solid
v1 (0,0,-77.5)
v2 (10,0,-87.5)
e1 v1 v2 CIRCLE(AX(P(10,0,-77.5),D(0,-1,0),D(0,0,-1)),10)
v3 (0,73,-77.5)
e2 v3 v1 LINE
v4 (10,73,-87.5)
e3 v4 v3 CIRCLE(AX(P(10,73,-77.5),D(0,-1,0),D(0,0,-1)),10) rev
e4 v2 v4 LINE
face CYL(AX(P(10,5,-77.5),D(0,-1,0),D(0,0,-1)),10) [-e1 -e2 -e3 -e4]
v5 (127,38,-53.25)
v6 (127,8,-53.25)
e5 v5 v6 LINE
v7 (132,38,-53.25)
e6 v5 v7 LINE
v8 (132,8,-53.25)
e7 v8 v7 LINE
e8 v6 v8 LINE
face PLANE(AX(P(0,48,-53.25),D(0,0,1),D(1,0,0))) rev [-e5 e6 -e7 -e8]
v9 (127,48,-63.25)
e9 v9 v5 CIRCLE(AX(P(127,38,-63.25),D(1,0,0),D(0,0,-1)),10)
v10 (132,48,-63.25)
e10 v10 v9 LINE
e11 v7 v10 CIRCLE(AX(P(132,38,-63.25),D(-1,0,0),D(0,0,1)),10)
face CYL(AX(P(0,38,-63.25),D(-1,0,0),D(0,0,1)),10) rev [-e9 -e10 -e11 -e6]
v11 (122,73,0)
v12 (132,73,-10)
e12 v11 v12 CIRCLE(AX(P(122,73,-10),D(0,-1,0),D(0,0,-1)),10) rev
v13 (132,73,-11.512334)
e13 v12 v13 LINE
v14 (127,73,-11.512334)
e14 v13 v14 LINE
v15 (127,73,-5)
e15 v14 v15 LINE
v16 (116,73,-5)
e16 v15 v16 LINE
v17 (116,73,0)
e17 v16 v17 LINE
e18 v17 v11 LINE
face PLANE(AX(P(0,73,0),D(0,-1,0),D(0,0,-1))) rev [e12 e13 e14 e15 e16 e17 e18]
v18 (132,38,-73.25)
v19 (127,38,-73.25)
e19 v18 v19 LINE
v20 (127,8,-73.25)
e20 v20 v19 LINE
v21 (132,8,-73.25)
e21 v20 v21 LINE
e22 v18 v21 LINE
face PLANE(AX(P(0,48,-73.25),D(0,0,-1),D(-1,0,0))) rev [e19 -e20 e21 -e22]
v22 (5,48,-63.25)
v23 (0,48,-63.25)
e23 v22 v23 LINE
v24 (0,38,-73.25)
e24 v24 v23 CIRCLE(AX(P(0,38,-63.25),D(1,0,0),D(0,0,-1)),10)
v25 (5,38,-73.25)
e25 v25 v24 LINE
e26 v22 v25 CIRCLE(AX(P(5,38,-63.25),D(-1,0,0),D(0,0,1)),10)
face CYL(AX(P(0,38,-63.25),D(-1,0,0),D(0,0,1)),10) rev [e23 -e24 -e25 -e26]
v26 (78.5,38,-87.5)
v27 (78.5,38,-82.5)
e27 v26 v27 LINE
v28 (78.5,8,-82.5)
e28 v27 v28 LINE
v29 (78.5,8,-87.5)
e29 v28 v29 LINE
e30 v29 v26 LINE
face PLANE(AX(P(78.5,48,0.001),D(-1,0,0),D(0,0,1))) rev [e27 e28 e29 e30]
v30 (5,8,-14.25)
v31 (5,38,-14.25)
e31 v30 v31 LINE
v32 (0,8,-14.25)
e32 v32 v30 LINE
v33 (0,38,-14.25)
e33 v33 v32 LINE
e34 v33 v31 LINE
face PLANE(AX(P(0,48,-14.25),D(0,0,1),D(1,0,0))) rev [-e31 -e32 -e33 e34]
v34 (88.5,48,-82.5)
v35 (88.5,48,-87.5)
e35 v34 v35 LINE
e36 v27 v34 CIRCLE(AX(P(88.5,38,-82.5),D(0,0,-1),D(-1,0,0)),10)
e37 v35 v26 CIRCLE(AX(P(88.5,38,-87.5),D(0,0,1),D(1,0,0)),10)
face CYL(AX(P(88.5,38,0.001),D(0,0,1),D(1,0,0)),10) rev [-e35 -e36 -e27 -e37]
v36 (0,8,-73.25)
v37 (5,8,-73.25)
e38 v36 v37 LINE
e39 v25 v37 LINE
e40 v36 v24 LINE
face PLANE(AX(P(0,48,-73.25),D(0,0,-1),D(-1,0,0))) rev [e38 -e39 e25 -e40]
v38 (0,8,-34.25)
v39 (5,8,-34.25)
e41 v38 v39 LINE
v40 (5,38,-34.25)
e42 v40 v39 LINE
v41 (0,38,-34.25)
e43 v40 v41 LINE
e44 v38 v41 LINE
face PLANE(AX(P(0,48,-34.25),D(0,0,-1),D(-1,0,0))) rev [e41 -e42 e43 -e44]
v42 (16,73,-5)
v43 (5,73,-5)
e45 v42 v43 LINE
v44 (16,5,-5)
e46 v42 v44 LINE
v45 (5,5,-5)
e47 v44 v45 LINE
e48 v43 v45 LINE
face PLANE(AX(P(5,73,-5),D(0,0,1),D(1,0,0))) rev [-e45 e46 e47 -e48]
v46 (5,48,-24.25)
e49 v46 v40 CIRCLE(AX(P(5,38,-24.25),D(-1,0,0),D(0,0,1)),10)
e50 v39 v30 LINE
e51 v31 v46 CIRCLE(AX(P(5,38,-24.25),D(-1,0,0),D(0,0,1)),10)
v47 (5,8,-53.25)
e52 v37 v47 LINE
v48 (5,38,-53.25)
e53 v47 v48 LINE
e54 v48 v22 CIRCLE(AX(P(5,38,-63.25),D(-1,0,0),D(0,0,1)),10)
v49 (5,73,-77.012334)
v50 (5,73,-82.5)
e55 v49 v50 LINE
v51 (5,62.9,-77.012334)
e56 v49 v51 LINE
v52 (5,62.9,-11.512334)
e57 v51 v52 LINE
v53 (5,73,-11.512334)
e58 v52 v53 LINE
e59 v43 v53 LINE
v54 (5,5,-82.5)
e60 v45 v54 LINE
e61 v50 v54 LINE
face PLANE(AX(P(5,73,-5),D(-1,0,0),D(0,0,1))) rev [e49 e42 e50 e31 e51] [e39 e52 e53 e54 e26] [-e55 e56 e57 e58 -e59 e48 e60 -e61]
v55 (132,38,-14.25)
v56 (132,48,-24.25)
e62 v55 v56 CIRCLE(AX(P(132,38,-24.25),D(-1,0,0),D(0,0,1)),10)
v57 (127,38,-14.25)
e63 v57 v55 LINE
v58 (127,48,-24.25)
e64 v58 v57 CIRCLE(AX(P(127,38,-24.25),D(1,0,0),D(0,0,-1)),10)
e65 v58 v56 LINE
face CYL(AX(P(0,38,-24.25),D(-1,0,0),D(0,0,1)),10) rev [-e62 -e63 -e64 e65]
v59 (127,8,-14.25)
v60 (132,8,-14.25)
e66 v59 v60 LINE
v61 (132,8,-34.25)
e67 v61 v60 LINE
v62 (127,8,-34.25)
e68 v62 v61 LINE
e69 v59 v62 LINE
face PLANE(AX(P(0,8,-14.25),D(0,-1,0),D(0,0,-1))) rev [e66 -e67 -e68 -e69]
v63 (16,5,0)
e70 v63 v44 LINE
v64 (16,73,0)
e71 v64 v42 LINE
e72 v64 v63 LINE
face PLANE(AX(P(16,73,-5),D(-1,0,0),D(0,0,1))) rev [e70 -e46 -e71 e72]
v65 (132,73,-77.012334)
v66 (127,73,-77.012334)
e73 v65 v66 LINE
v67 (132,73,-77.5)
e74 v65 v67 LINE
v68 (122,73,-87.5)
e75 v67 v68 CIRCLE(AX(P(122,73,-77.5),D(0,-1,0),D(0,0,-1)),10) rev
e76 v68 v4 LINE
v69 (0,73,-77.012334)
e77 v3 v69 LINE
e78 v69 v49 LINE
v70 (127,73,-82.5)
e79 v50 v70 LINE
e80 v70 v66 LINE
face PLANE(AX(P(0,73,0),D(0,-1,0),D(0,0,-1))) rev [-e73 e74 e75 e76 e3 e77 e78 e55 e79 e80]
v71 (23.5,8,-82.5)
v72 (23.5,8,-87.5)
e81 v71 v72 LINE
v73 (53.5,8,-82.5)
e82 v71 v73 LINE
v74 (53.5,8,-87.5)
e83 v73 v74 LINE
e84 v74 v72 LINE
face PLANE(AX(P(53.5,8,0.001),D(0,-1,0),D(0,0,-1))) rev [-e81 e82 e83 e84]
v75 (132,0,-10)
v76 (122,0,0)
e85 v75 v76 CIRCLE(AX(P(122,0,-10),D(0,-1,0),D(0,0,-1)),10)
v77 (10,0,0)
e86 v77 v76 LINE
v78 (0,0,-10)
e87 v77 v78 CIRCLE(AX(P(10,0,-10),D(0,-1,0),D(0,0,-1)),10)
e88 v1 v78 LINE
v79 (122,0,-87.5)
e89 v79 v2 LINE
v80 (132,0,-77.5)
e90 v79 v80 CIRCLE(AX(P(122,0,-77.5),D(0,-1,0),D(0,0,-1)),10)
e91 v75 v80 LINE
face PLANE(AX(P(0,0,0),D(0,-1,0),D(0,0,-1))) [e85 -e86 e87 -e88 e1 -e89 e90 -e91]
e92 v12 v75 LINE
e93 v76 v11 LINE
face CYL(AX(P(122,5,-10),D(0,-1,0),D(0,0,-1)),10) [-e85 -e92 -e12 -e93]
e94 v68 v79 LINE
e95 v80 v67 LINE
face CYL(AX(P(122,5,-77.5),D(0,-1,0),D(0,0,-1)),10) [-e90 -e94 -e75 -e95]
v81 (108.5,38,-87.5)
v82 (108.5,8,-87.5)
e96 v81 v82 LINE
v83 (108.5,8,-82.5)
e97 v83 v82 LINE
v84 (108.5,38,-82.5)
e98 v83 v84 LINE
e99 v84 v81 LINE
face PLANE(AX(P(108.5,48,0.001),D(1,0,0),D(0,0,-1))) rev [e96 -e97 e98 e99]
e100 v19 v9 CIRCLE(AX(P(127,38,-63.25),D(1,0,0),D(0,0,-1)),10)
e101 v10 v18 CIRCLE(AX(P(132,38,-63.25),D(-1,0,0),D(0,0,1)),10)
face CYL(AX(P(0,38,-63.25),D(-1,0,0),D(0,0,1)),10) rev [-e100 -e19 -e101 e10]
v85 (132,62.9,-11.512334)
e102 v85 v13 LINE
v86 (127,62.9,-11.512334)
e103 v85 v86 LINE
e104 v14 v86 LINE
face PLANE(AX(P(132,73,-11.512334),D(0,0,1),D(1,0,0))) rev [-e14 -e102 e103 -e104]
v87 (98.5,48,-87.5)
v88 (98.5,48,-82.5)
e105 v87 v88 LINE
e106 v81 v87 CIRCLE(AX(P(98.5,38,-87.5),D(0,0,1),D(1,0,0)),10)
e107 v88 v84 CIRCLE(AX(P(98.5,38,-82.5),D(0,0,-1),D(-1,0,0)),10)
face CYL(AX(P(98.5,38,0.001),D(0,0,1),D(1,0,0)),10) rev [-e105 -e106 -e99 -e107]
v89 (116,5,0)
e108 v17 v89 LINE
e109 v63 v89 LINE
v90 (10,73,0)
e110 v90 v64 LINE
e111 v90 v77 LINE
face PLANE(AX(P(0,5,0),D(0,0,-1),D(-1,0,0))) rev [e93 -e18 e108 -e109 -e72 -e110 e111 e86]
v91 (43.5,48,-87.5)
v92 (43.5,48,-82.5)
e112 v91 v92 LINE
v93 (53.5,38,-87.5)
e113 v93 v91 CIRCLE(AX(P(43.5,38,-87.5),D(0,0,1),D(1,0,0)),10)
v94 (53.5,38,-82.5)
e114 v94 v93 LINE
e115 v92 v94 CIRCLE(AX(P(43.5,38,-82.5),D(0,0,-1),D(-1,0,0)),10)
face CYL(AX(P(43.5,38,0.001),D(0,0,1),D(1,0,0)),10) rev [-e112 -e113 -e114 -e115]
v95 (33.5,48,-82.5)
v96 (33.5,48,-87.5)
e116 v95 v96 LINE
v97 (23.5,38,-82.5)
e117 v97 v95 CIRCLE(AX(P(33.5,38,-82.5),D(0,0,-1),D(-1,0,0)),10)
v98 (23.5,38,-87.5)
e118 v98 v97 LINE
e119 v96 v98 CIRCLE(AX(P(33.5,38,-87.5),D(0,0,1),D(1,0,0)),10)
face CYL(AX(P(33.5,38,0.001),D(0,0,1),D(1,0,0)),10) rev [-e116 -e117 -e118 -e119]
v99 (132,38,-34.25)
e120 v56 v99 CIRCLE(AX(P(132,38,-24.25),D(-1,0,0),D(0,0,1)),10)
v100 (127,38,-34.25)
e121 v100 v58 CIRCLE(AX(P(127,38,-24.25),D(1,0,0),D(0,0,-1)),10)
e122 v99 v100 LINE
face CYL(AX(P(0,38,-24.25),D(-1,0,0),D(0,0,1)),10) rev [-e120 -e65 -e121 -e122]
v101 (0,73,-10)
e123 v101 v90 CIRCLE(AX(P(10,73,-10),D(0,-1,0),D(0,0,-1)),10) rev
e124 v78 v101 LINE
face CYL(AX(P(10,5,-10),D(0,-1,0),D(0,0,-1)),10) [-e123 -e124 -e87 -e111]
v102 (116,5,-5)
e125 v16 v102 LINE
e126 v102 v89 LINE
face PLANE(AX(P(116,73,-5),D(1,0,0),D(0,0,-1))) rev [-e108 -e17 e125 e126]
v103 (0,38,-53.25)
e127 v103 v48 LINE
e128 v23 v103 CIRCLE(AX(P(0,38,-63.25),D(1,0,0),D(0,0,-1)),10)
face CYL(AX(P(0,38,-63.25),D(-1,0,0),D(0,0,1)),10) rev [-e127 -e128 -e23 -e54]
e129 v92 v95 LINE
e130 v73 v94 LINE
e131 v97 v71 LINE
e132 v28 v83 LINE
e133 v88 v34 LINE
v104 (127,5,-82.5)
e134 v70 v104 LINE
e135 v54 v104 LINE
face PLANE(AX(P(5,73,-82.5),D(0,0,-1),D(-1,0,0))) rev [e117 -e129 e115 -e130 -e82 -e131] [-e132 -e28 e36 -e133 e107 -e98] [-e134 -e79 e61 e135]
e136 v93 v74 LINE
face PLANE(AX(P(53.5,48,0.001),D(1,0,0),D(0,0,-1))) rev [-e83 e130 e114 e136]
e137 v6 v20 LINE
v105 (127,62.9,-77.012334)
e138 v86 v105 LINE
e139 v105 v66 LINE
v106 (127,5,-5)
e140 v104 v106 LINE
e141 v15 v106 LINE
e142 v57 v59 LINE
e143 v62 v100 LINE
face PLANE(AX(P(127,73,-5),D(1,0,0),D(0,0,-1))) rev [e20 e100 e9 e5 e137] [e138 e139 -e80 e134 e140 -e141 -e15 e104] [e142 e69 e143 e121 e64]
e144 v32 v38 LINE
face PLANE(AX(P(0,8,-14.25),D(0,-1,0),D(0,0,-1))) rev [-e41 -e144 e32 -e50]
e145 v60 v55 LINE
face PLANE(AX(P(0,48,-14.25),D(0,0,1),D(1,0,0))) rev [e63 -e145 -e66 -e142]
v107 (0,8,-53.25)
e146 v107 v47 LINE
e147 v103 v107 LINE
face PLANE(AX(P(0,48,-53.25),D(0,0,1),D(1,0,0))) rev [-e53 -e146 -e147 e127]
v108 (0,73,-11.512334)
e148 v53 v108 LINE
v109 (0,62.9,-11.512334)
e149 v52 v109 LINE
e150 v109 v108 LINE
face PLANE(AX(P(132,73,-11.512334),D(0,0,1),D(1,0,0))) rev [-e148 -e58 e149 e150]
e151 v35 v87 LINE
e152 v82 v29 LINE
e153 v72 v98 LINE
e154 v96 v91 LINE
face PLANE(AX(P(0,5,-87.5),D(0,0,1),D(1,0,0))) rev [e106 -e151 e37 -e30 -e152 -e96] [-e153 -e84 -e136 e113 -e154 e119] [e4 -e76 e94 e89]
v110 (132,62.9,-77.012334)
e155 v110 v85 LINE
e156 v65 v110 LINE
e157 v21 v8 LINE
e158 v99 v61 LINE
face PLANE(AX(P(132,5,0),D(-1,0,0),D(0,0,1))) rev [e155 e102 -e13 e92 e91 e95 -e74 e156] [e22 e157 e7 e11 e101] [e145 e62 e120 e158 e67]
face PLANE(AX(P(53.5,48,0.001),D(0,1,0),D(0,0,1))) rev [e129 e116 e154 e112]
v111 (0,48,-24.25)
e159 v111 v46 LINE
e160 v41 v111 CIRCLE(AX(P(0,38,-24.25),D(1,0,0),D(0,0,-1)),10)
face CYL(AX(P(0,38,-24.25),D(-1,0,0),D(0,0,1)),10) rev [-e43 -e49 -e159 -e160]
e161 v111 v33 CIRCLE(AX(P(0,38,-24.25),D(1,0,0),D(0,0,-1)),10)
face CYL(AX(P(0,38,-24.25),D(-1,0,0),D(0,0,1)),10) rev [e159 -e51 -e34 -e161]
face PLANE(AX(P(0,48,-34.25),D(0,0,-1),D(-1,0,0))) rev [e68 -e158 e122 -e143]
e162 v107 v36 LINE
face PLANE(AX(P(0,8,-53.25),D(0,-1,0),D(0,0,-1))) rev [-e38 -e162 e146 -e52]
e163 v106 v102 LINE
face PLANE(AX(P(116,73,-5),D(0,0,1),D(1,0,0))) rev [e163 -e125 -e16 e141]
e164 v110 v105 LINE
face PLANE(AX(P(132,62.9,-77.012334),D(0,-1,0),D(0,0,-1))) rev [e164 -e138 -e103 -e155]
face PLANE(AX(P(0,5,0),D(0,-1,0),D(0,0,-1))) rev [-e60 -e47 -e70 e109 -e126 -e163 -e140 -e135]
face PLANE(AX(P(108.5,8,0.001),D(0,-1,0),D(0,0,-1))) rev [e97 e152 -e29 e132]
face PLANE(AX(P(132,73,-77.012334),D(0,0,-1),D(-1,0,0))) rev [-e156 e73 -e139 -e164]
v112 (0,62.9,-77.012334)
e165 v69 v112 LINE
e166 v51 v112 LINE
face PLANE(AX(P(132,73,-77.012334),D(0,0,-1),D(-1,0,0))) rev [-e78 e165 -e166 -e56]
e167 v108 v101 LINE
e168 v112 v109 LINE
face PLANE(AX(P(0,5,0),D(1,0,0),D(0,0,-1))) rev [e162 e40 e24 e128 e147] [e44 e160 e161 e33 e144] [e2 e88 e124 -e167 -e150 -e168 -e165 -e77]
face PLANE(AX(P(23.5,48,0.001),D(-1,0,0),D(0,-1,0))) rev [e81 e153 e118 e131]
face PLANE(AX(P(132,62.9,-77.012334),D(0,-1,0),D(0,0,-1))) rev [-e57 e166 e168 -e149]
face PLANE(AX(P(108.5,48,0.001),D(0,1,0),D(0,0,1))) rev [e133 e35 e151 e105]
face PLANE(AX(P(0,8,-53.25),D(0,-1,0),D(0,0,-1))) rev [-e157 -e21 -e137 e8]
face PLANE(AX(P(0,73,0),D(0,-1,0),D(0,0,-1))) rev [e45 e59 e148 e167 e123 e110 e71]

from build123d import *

# Parameters (mm, degrees)
SKETCH1_W               = 132
SKETCH1_H               = 87.5
BOSS_EXTRUDE1_DEPTH     = 5
BOSS_EXTRUDE2_DEPTH     = 68
CUT_EXTRUDE1_DEPTH      = 175.382481918
CUT_EXTRUDE1_DEPTH_BACK = 175.382481918
SKETCH3_W               = 20
SKETCH3_H               = 40
CUT_EXTRUDE2_REACH      = 176.382
SKETCH4_W               = 30
SKETCH4_H               = 40
SKETCH5_W               = 65.5
SKETCH5_H               = 10.1
CUT_EXTRUDE3_DEPTH      = 175.382481918
FILLET1_R               = 10


with BuildPart() as part:
    # Sketch1 → Boss-Extrude1 (new body)
    with BuildSketch(Plane(origin=(0, 0, 0), x_dir=(1, 0, 0), z_dir=(0, 1, 0))):
        with Locations((66, 43.75)):
            Rectangle(SKETCH1_W, SKETCH1_H)
    extrude(amount=BOSS_EXTRUDE1_DEPTH)

    # Sketch2 → Boss-Extrude2 (add)
    with BuildSketch(Plane(origin=(0, 5, 0), x_dir=(1, 0, 0), z_dir=(0, 1, 0))):
        Polygon((5, 5), (16, 5), (16, 0), (0, 0), (0, 87.5), (132, 87.5), (132, 0), (116, 0), (116, 5), (127, 5), (127, 82.5), (5, 82.5), align=None)
    extrude(amount=BOSS_EXTRUDE2_DEPTH)

    # Sketch3 → Cut-Extrude1 (cut, two sides: drawn at the far end of the back side and taken through both)
    with BuildSketch(Plane(origin=(132, 0, 0), x_dir=(0, 0, -1), z_dir=(1, 0, 0)).offset(-CUT_EXTRUDE1_DEPTH_BACK)):
        with Locations((24.25, 28)):
            Rectangle(SKETCH3_W, SKETCH3_H)
        with Locations((63.25, 28)):
            Rectangle(SKETCH3_W, SKETCH3_H)
    extrude(amount=CUT_EXTRUDE1_DEPTH + CUT_EXTRUDE1_DEPTH_BACK, mode=Mode.SUBTRACT)

    # Sketch4 → Cut-Extrude2 (cut, up to next)
    with BuildSketch(Plane(origin=(0, 0, -87.5), x_dir=(-1, 0, 0), z_dir=(0, 0, -1)), mode=Mode.PRIVATE) as cut_extrude2_sk1:
        with Locations((-93.5, 28)):
            Rectangle(SKETCH4_W, SKETCH4_H)
    cut_extrude2_tool1 = extrude(cut_extrude2_sk1.sketch, amount=-CUT_EXTRUDE2_REACH, mode=Mode.PRIVATE) & part.part
    # Sketch4 → Cut-Extrude2 (cut, up to next)
    with BuildSketch(Plane(origin=(0, 0, -87.5), x_dir=(-1, 0, 0), z_dir=(0, 0, -1)), mode=Mode.PRIVATE) as cut_extrude2_sk2:
        with Locations((-38.5, 28)):
            Rectangle(SKETCH4_W, SKETCH4_H)
    cut_extrude2_tool2 = extrude(cut_extrude2_sk2.sketch, amount=-CUT_EXTRUDE2_REACH, mode=Mode.PRIVATE) & part.part
    add(cut_extrude2_tool1.solids().sort_by_distance((93.5, 28, -87.5))[0], mode=Mode.SUBTRACT)
    add(cut_extrude2_tool2.solids().sort_by_distance((38.5, 28, -87.5))[0], mode=Mode.SUBTRACT)

    # Sketch5 → Cut-Extrude3 (cut, through all)
    with BuildSketch(Plane.ZY):
        with Locations((-44.2623336, 67.95)):
            Rectangle(SKETCH5_W, SKETCH5_H)
    extrude(amount=-CUT_EXTRUDE3_DEPTH, mode=Mode.SUBTRACT)

    # Fillet1
    fillet1_edges = [part.edges().sort_by_distance(p)[0] for p in [
        (108.5, 48, -85),
        (78.5, 48, -85),
        (53.5, 48, -85),
        (23.5, 48, -85),
        (2.5, 48, -73.25),
        (2.5, 48, -53.25),
        (2.5, 48, -14.25),
        (2.5, 48, -34.25),
        (129.5, 48, -14.25),
        (129.5, 48, -34.25),
        (129.5, 48, -73.25),
        (129.5, 48, -53.25),
        (132, 36.5, -87.5),
        (132, 36.5, 0),
        (0, 36.5, 0),
        (0, 36.5, -87.5),
    ]]
    fillet(fillet1_edges, radius=FILLET1_R - 0.0001)  # a hair under: the kernel refuses the full size


solid = part.part
